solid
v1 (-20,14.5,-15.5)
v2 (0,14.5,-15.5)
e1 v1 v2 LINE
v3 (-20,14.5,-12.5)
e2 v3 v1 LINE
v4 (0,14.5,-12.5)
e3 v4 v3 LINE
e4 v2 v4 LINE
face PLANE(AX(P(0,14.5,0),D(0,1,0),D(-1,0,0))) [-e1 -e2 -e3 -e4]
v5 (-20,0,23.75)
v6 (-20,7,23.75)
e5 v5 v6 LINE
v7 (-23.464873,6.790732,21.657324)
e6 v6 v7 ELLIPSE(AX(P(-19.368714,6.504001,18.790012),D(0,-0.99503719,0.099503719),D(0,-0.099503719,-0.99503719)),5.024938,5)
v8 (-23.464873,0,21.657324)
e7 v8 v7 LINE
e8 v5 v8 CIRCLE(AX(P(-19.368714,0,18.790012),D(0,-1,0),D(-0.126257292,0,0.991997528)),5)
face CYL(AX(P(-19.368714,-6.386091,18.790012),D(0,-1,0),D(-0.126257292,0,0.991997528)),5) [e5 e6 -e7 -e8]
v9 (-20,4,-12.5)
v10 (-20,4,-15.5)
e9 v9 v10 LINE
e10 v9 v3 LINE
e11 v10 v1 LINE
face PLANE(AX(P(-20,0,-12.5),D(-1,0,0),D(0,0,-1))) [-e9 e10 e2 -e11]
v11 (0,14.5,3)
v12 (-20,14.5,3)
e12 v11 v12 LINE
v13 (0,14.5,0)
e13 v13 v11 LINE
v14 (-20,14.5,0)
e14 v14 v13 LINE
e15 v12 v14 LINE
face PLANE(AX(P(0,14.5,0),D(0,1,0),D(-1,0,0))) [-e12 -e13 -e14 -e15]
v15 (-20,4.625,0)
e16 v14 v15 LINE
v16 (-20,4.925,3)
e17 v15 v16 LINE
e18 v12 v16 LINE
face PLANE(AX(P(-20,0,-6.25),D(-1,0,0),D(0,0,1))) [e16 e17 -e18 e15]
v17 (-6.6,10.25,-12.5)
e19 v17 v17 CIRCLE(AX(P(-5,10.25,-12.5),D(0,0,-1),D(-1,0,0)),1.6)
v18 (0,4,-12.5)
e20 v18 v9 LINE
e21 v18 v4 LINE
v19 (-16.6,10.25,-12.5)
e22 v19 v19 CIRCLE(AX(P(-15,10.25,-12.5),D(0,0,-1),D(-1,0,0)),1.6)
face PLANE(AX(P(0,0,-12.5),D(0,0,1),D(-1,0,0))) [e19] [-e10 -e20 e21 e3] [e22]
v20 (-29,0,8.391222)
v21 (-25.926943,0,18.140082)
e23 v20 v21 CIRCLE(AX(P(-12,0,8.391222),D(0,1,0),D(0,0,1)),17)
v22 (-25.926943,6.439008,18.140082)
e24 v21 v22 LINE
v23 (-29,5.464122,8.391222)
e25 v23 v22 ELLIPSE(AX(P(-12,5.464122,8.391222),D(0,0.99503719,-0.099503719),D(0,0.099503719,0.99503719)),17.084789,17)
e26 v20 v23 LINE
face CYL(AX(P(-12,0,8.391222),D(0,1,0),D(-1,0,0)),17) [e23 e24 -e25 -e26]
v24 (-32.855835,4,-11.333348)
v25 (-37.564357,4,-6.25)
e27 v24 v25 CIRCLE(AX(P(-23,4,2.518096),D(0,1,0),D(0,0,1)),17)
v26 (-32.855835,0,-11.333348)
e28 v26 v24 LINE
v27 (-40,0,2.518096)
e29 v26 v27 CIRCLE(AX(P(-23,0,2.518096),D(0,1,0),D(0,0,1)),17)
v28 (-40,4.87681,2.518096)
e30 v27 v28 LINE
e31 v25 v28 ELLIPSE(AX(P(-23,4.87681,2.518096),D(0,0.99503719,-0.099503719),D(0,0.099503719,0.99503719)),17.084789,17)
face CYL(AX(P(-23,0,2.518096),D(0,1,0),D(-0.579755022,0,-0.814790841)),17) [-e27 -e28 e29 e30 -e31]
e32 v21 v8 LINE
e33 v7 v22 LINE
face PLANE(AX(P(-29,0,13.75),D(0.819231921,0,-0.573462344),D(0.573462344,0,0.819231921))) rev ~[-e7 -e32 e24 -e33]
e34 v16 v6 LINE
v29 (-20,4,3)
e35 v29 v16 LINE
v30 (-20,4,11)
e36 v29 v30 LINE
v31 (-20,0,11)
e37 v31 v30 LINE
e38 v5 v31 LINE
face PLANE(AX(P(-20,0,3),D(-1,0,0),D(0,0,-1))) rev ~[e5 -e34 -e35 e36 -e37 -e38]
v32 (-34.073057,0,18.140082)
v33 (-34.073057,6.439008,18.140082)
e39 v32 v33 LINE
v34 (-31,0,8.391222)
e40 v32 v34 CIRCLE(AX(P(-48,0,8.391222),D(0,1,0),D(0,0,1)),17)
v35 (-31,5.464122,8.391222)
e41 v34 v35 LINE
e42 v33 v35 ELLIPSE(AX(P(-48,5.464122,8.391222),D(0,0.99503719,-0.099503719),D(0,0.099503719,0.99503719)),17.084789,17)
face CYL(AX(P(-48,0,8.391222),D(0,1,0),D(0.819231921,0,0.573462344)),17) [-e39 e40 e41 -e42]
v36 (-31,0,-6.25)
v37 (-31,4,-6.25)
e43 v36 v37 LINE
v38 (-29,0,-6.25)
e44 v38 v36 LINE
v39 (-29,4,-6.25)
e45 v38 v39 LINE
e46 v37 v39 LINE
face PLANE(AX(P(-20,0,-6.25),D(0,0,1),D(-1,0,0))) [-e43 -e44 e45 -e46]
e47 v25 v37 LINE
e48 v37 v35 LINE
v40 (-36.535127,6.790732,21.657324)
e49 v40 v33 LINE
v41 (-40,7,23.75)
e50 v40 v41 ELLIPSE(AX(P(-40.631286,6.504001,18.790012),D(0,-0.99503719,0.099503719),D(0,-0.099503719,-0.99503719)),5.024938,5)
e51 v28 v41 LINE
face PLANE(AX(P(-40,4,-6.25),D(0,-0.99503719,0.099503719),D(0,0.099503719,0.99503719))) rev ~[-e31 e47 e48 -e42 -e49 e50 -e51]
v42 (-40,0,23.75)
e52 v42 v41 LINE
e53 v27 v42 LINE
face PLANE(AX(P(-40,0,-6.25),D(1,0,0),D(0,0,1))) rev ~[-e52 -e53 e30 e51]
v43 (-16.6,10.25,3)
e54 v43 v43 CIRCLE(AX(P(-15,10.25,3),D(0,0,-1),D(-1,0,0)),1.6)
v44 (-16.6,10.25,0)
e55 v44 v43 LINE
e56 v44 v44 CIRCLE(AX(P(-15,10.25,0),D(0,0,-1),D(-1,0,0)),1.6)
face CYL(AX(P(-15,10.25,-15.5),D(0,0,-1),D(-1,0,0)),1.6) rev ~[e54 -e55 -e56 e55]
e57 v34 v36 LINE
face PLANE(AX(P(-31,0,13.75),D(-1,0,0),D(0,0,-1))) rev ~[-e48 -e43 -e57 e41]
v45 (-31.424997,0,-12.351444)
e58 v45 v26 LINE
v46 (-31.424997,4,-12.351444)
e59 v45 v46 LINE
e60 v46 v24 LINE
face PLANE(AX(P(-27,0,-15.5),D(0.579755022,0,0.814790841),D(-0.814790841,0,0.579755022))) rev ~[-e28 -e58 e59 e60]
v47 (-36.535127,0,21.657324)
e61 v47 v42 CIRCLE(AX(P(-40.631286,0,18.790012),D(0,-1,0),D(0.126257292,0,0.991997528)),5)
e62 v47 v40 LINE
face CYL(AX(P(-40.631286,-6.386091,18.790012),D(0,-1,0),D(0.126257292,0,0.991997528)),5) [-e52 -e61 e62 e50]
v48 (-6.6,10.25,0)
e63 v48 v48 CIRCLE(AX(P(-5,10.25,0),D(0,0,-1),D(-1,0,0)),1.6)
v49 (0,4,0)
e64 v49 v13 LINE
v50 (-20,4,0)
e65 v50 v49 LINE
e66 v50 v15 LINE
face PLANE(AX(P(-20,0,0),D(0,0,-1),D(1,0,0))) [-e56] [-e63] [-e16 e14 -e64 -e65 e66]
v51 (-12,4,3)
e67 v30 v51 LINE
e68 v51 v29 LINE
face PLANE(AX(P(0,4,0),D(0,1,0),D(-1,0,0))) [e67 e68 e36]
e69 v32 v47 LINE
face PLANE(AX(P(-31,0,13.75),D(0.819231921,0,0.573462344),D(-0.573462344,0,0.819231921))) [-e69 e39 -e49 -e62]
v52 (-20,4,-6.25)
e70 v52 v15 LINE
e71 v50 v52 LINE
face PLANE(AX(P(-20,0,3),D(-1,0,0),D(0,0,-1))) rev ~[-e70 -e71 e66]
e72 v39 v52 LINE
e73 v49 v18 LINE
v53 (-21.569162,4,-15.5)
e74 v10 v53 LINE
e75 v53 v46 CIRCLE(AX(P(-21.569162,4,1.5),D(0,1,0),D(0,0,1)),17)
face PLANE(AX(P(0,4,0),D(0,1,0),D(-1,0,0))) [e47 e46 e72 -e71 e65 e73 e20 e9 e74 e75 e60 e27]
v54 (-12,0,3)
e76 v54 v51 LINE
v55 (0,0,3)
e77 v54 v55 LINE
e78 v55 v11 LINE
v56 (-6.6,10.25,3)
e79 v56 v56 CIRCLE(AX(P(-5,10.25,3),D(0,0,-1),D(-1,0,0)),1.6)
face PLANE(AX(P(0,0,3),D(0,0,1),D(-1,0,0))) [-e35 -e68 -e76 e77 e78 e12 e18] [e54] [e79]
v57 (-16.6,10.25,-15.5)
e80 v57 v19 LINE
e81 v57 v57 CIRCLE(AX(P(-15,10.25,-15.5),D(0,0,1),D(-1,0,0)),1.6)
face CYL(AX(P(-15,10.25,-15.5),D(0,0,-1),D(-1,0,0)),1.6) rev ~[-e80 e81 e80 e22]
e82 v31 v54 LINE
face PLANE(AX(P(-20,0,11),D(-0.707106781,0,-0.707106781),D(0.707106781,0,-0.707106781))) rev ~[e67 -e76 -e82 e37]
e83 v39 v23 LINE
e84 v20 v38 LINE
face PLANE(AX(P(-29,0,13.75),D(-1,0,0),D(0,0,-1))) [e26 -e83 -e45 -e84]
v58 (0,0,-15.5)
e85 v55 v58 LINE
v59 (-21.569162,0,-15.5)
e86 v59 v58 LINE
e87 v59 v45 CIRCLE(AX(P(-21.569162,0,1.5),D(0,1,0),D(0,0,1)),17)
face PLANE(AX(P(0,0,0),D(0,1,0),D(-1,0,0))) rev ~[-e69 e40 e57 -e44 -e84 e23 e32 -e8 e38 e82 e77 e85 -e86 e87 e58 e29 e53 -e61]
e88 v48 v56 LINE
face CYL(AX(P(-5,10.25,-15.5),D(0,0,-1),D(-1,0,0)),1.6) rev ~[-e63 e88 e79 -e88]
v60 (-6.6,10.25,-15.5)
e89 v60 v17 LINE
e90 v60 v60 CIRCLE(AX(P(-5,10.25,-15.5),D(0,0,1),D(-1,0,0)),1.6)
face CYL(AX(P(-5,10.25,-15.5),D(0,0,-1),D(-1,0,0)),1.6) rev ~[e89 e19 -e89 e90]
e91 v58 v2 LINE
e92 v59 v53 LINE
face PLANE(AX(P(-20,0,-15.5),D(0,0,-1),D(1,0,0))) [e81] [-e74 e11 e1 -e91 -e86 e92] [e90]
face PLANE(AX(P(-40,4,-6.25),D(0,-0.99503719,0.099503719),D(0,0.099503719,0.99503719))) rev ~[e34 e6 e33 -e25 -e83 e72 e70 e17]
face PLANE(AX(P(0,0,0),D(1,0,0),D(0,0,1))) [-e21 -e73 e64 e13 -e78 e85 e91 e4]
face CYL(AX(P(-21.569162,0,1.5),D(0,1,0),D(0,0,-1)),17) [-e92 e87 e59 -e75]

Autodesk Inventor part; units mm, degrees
ref_plane "YZ Plane" through (0, 0, 0) normal (1, 0, 0) x (0, 1, 0)
ref_plane "XZ Plane" through (0, 0, 0) normal (0, 1, 0) x (-1, 0, 0)
ref_plane "XY Plane" through (0, 0, 0) normal (0, 0, 1) x (1, 0, 0)
sketch "Sketch1" plane through (0, 0, 0) normal (0, 1, 0) x (-1, 0, 0)
  line L0 (0, 0) -> (0, -12.5)
  line L1 (0, -12.5) -> (20, -12.5)
  line L2 (20, -12.5) -> (20, -15.5)
  line L3 (20, -15.5) -> (0, -15.5)
  line L4 (0, -15.5) -> (0, -12.5)
  line L5 (0, 0) -> (0, 3)
  line L6 (0, 3) -> (20, 3)
  line L7 (20, 3) -> (20, 0)
  line L8 (20, 0) -> (0, 0)
  line L9 (20, 0) -> (20, -12.5)
  line L10 (20, -6.25) -> (30, -6.25)
  line L11 (30, -6.25) -> (40, -6.25)
  line L12 (40, -6.25) -> (40, 23.75)
  line L13 (20, -6.25) -> (20, 23.75)
  line L14 (20, 23.75) -> (22, 23.75)
  line L15 (40, 23.75) -> (38, 23.75)
  line L16 (29, 13.75) -> (22, 23.75)
  line L17 (31, 13.75) -> (38, 23.75)
  line L18 (31, 13.75) -> (31, -6.25)
  line L19 (29, 13.75) -> (29, -6.25)
  line L20 (20, -15.5) -> (27, -15.5)
  line L21 (27, -15.5) -> (40, -6.25)
  line L22 (20, 3) -> (12, 3)
  line L23 (20, 3) -> (20, 11)
  line L24 (20, 11) -> (12, 3)
  line L25 (20, 3) -> (12, 3)
  line L26 (20, 3) -> (20, 11)
  dimension "d0" = 12.5
  dimension "d1" = 20
  dimension "d2" = 3
  dimension "d3" = 3
  dimension "d4" = 20
  dimension "d5" = 10
  dimension "d6" = 10
  dimension "d7" = 30
  dimension "d8" = 2
  dimension "d9" = 2
  dimension "d13" = 7
  dimension "d22" = 8
  dimension "d23" = 8
extrude "Extrusion1" add sketch "Sketch1" along normal blind 14.5 contours L5 L6 L7 L8 | L1 L2 L3 L4
extrude "Extrusion2" add sketch "Sketch1" along normal blind 4 contours L8 L9 L1 L0 | L9 L10 L11 L21 L20 L2
extrude "Extrusion3" add sketch "Sketch1" along normal blind 7 contours L7 L13 L14 L16 L19 L10 L9 | L11 L18 L17 L15 L12
sketch "Sketch2" plane through (-40, 0, -6.25) normal (-1, 0, 0) x (0, 0, 1)
  line L0 (6.25, 4) -> (-6.25, 4) projected
  line L1 (0, 4) -> (30, 7)
  line L2 (30, 7) -> (30, 0)
  line L3 (30, 0) -> (30, 7) projected
  line L4 (30, 0) -> (0, 0)
  line L5 (9.25, 0) -> (-9.25, 0) projected
  line L6 (0, 4) -> (0, 0)
  line L7 (0, 0) -> (0, 4) projected
  line L8 (0, 0) -> (0, 4)
  line L9 (0, 4) -> (0, 7) projected
  line L10 (0, 4) -> (0, 7)
  line L11 (0, 7) -> (30, 7)
  point P0 (6.25, 0)
extrude "Extrusion5" add sketch "Sketch1" along normal blind 4 contours L24 L13 L6
extrude "Extrusion6" cut sketch "Sketch2" against normal blind 20 contours L9 L11 L1
sketch "Sketch3" plane through (0, 14.5, -15.5) normal (0, 0, -1) x (-1, 0, 0)
  line L0 (20, 0) -> (0, 0)
  line L1 (0, 0) -> (20, 0) projected
  line L2 (10, 0) -> (20, 0)
  line L3 (15, 0) -> (15, -10.5)
  line L4 (20, -10.5) -> (12, -10.5) projected
  line L5 (15, -10.5) -> (15, -4.25)
  line L6 (10, 0) -> (0, 0)
  line L7 (5, 0) -> (5, -10.5)
  line L8 (0, -10.5) -> (20, -10.5) projected
  line L9 (5, -10.5) -> (5, -4.25)
  circle A0 centre (15, -4.25) radius 1.6
  circle A1 centre (5, -4.25) radius 1.6
  point P0 (0, -14.5)
  dimension "d28" = 6.25
  dimension "d29" = 6.25
  dimension "d30" = 3.2
  dimension "d31" = 3.2
extrude "Extrusion7" cut sketch "Sketch3" against normal blind 20 contours A0 L3 | L3 A0 | A1 L7 | L7 A1
fillet "Fillet1" radius 17 4 edges at (-31, 3, 13.75) (-29, 3, 13.75) (-27, 2, -15.5) (-40, 2, -6.25)
fillet "Fillet2" radius 5 2 edges at (-38, 3.5, 23.75) (-22, 3.5, 23.75)
properties part number "clip"
